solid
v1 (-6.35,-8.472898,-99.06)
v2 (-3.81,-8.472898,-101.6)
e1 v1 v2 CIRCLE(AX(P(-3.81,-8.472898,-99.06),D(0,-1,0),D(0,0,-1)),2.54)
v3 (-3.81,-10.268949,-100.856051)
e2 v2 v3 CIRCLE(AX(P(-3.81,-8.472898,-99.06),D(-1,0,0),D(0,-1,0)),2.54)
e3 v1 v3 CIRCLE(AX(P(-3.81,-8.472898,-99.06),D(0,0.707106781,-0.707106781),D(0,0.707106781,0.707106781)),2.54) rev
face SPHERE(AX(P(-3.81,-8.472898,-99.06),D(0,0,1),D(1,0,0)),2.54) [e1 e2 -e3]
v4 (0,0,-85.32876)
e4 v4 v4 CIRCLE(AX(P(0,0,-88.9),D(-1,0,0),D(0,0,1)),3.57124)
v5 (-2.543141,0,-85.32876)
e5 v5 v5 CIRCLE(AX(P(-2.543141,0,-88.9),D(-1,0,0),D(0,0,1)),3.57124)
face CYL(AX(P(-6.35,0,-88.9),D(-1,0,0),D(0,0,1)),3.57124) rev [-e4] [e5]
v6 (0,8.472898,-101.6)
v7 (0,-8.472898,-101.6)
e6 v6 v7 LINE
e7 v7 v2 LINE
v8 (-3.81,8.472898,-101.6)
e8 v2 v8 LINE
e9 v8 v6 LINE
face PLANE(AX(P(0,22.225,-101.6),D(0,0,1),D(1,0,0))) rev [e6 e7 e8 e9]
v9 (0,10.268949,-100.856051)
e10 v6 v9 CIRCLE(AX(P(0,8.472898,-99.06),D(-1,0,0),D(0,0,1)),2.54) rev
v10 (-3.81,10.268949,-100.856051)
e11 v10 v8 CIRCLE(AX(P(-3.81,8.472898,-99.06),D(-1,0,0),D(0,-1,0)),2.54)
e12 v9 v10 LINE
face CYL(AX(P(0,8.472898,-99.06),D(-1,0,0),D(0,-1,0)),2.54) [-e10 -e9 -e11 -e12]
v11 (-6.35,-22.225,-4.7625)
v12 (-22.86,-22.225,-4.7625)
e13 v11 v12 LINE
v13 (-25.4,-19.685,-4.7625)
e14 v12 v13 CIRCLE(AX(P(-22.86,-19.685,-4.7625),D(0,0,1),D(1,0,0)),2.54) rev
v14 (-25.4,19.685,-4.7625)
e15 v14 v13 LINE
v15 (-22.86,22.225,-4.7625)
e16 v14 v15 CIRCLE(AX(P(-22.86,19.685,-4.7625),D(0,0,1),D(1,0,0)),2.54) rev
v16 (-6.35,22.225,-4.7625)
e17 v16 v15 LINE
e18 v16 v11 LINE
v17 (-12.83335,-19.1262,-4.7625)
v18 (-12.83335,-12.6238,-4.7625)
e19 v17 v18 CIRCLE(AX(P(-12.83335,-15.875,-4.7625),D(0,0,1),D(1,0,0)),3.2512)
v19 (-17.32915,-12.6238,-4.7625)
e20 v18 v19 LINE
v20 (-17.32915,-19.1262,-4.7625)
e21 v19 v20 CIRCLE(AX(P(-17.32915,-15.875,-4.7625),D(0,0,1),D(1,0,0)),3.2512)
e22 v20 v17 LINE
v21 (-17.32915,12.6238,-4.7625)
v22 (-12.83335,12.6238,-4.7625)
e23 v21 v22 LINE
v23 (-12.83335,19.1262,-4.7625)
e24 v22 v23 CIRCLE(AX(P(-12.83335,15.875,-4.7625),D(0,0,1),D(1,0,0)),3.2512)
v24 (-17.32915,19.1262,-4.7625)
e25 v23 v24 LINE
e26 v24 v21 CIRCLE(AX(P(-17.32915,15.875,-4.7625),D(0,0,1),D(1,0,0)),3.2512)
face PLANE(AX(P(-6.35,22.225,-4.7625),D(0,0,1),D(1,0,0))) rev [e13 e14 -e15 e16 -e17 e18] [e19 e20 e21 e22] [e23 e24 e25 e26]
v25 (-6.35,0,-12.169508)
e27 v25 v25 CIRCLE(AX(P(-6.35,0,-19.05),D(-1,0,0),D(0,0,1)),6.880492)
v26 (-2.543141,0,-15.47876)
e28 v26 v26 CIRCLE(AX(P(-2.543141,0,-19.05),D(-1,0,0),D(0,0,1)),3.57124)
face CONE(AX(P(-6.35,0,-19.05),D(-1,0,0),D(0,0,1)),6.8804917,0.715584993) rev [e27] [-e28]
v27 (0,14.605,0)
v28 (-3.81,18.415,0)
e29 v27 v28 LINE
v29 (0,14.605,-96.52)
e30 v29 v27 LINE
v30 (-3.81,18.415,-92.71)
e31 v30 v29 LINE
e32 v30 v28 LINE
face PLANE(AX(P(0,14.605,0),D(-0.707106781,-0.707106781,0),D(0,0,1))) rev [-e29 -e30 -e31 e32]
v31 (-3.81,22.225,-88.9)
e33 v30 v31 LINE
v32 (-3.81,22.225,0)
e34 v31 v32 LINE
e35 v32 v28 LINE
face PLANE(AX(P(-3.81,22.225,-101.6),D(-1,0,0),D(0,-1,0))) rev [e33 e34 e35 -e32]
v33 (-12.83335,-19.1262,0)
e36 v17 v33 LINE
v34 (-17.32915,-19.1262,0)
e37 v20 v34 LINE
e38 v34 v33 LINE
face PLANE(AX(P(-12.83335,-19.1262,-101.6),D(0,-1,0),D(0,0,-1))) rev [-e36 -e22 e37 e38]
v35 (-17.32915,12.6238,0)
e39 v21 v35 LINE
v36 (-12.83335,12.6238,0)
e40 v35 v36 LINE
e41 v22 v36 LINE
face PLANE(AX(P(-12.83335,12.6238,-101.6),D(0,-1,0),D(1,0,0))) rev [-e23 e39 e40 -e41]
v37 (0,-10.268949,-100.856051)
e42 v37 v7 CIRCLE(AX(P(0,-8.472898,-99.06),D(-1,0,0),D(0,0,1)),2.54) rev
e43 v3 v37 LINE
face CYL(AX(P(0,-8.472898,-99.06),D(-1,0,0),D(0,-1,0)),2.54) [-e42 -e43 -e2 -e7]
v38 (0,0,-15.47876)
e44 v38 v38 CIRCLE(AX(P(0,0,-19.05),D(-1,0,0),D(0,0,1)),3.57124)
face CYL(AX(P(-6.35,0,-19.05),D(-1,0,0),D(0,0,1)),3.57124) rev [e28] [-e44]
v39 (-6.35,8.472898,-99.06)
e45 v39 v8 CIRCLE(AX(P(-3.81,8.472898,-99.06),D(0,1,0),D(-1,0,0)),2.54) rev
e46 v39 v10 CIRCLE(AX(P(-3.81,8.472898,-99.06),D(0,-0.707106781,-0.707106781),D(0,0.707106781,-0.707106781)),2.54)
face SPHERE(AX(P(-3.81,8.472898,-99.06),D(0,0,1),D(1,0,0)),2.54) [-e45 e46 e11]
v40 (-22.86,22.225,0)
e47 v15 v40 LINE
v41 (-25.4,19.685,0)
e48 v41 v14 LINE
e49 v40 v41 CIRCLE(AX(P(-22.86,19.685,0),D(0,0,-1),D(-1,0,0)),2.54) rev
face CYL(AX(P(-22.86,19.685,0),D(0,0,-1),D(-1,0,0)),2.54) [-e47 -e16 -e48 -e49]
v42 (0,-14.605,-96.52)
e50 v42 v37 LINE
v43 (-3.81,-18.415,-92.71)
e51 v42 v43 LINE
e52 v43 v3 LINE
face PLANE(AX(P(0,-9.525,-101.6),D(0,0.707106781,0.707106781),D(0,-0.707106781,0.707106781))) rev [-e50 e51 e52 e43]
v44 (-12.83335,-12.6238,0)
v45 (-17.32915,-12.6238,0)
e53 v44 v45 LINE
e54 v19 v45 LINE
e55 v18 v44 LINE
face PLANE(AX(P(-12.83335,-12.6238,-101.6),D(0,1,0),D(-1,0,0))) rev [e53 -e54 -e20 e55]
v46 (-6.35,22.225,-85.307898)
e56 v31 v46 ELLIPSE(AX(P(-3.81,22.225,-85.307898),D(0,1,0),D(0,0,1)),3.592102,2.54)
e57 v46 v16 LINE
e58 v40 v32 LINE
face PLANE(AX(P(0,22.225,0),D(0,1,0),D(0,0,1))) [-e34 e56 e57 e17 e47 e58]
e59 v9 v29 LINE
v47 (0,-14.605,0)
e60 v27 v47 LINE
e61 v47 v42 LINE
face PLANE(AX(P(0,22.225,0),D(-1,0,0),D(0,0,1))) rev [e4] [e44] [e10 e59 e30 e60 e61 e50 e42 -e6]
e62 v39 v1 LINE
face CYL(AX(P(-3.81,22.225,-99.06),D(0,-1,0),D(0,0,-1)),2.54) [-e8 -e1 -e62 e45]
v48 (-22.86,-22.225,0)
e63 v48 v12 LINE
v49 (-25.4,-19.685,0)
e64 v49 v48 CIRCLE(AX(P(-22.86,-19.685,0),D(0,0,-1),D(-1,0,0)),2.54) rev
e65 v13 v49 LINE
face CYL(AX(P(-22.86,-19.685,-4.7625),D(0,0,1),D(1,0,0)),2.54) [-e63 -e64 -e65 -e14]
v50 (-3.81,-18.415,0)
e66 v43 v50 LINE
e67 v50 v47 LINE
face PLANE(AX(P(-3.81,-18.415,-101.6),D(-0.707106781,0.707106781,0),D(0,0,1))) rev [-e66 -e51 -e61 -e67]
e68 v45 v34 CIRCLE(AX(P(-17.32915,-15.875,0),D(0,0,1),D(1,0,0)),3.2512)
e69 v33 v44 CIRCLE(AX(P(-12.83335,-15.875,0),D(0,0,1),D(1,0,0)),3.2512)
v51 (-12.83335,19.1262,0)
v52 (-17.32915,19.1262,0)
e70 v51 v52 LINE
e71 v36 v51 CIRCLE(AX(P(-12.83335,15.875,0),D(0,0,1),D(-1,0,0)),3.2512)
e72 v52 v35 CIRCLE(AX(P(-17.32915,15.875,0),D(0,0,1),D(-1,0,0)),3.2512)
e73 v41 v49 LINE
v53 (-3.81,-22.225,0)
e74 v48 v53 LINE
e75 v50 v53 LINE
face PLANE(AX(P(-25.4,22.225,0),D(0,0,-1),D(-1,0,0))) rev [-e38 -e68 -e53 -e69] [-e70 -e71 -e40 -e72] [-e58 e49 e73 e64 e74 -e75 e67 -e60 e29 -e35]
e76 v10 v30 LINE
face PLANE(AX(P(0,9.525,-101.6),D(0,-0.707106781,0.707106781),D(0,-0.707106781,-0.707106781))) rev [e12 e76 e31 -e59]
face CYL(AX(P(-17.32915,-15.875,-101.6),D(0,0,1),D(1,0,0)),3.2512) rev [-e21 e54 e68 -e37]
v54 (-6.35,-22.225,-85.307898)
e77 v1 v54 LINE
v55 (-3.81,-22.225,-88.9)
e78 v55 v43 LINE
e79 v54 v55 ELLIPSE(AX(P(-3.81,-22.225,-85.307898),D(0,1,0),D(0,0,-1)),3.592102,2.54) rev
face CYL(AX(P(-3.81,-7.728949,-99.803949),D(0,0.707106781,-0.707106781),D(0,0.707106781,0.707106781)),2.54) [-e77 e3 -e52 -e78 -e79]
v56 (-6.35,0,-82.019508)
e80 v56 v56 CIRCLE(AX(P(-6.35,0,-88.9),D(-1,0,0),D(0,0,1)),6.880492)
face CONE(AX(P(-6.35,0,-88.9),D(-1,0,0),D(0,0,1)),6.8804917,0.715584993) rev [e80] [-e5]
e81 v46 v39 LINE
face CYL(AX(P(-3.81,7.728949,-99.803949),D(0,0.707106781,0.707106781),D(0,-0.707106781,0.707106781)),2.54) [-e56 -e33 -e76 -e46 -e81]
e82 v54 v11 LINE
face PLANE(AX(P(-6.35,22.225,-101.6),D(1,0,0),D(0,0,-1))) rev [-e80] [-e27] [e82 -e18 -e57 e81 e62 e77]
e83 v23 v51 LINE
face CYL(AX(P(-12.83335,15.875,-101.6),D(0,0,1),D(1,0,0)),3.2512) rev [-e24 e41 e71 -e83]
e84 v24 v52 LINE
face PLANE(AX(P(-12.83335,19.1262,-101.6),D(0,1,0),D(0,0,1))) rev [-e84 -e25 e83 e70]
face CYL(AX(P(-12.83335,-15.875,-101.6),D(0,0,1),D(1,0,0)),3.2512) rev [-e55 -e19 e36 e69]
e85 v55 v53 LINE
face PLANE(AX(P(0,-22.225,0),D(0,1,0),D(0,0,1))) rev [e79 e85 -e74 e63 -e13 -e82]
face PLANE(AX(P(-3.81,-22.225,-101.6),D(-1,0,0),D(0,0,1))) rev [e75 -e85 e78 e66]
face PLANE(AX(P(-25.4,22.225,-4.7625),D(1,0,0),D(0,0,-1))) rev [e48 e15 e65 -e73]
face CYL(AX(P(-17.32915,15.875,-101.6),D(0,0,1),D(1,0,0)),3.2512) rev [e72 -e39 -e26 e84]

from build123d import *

# Parameters (mm, degrees)
BOSS_EXTRUDE1_DEPTH                           = 22.225
SKETCH2_W                                     = 3.81
SKETCH2_H                                     = 3.81
CUT_EXTRUDE1_DEPTH                            = 108.059192156
CUT_EXTRUDE2_DEPTH                            = 108.059192156
FILLET1_R                                     = 2.54
CSK_FOR_1_4_FLAT_HEAD_MACHINE_SCREW1_AT_COUNT = 2
CSK_FOR_1_4_FLAT_HEAD_MACHINE_SCREW1_AT_PITCH = 69.85
CUT_EXTRUDE3_DEPTH                            = 106.732743864
FILLET2_R                                     = 2.54
CHAMFER1_SIZE                                 = 3.81


with BuildPart() as part:
    # Sketch1 → Boss-Extrude1 (new, symmetric)
    with BuildSketch(Plane(origin=(0, 0, 0), x_dir=(1, 0, 0), z_dir=(0, 1, 0))):
        Polygon((0, 0), (0, 101.6), (-6.35, 101.6), (-6.35, 4.7625), (-25.4, 4.7625), (-25.4, 0), align=None)
    extrude(amount=BOSS_EXTRUDE1_DEPTH, both=True)

    # Sketch2 → Cut-Extrude1 (cut, through all)
    with BuildSketch(Plane.XY):
        with Locations((-1.905, 20.32)):
            Rectangle(SKETCH2_W, SKETCH2_H)
        with Locations((-1.905, -20.32)):
            Rectangle(SKETCH2_W, SKETCH2_H)
    extrude(amount=-CUT_EXTRUDE1_DEPTH, mode=Mode.SUBTRACT)

    # Sketch3 → Cut-Extrude2 (cut, through all)
    with BuildSketch(Plane.XY):
        with BuildLine():
            Line((-12.83335, -19.1262), (-17.32915, -19.1262))
            ThreePointArc((-17.32915, -19.1262), (-20.58035, -15.875), (-17.32915, -12.6238))
            Line((-17.32915, -12.6238), (-12.83335, -12.6238))
            ThreePointArc((-12.83335, -12.6238), (-9.58215, -15.875), (-12.83335, -19.1262))
        make_face()
        with BuildLine():
            Line((-12.83335, 19.1262), (-17.32915, 19.1262))
            ThreePointArc((-17.32915, 19.1262), (-20.58035, 15.875), (-17.32915, 12.6238))
            Line((-17.32915, 12.6238), (-12.83335, 12.6238))
            ThreePointArc((-12.83335, 12.6238), (-9.58215, 15.875), (-12.83335, 19.1262))
        make_face()
    extrude(amount=-CUT_EXTRUDE2_DEPTH, mode=Mode.SUBTRACT)

    # Fillet1
    fillet1_edges = [part.edges().sort_by_distance(p)[0] for p in [
        (-25.4, 22.225, -2.38125),
        (-25.4, -22.225, -2.38125),
    ]]
    fillet(fillet1_edges, radius=FILLET1_R)

    # Sketch5 → CSK for 1/4 Flat Head Machine Screw1 (revolve, cut)
    with BuildSketch(Plane(origin=(-6.35, 0, -19.05), x_dir=(0, 0, 1), z_dir=(0, 1, 0))):
        Polygon((0, 0), (0, 6.35), (3.57124, 6.35), (3.57124, 3.806858607), (6.8804917, 0), align=None)
    csk_for_1_4_flat_head_machine_screw1 = revolve(axis=Axis((-12.7, 0, -19.05), (1, 0, 0)), mode=Mode.SUBTRACT)

    # CSK for 1/4 Flat Head Machine Screw1 at: CSK for 1/4 Flat Head Machine Screw1 ×2
    with Locations(*[(0, 0, -i * CSK_FOR_1_4_FLAT_HEAD_MACHINE_SCREW1_AT_PITCH) for i in range(1, CSK_FOR_1_4_FLAT_HEAD_MACHINE_SCREW1_AT_COUNT)]):
        add(csk_for_1_4_flat_head_machine_screw1, mode=Mode.SUBTRACT)

    # Sketch6 → Cut-Extrude3 (cut, through all)
    with BuildSketch(Plane.ZY.offset(6.35)):
        Polygon((-88.9, -22.225), (-101.6, -22.225), (-101.6, -9.525), align=None)
        Polygon((-101.6, 22.225), (-101.6, 9.525), (-88.9, 22.225), align=None)
    extrude(amount=-CUT_EXTRUDE3_DEPTH, mode=Mode.SUBTRACT)

    # Fillet2
    fillet2_edges = [part.edges().sort_by_distance(p)[0] for p in [
        (-6.35, -15.875, -95.25),
        (-6.35, 0, -101.6),
        (-6.35, 15.875, -95.25),
        (-3.175, 9.525, -101.6),
        (-3.175, -9.525, -101.6),
    ]]
    fillet(fillet2_edges, radius=FILLET2_R)

    # Chamfer1
    chamfer1_edges = [part.edges().sort_by_distance(p)[0] for p in [
        (0, 18.415, -46.355),
        (0, -18.415, -46.355),
    ]]
    chamfer(chamfer1_edges, length=CHAMFER1_SIZE - 0.0001)  # a hair under: the kernel refuses the full size


solid = part.part
